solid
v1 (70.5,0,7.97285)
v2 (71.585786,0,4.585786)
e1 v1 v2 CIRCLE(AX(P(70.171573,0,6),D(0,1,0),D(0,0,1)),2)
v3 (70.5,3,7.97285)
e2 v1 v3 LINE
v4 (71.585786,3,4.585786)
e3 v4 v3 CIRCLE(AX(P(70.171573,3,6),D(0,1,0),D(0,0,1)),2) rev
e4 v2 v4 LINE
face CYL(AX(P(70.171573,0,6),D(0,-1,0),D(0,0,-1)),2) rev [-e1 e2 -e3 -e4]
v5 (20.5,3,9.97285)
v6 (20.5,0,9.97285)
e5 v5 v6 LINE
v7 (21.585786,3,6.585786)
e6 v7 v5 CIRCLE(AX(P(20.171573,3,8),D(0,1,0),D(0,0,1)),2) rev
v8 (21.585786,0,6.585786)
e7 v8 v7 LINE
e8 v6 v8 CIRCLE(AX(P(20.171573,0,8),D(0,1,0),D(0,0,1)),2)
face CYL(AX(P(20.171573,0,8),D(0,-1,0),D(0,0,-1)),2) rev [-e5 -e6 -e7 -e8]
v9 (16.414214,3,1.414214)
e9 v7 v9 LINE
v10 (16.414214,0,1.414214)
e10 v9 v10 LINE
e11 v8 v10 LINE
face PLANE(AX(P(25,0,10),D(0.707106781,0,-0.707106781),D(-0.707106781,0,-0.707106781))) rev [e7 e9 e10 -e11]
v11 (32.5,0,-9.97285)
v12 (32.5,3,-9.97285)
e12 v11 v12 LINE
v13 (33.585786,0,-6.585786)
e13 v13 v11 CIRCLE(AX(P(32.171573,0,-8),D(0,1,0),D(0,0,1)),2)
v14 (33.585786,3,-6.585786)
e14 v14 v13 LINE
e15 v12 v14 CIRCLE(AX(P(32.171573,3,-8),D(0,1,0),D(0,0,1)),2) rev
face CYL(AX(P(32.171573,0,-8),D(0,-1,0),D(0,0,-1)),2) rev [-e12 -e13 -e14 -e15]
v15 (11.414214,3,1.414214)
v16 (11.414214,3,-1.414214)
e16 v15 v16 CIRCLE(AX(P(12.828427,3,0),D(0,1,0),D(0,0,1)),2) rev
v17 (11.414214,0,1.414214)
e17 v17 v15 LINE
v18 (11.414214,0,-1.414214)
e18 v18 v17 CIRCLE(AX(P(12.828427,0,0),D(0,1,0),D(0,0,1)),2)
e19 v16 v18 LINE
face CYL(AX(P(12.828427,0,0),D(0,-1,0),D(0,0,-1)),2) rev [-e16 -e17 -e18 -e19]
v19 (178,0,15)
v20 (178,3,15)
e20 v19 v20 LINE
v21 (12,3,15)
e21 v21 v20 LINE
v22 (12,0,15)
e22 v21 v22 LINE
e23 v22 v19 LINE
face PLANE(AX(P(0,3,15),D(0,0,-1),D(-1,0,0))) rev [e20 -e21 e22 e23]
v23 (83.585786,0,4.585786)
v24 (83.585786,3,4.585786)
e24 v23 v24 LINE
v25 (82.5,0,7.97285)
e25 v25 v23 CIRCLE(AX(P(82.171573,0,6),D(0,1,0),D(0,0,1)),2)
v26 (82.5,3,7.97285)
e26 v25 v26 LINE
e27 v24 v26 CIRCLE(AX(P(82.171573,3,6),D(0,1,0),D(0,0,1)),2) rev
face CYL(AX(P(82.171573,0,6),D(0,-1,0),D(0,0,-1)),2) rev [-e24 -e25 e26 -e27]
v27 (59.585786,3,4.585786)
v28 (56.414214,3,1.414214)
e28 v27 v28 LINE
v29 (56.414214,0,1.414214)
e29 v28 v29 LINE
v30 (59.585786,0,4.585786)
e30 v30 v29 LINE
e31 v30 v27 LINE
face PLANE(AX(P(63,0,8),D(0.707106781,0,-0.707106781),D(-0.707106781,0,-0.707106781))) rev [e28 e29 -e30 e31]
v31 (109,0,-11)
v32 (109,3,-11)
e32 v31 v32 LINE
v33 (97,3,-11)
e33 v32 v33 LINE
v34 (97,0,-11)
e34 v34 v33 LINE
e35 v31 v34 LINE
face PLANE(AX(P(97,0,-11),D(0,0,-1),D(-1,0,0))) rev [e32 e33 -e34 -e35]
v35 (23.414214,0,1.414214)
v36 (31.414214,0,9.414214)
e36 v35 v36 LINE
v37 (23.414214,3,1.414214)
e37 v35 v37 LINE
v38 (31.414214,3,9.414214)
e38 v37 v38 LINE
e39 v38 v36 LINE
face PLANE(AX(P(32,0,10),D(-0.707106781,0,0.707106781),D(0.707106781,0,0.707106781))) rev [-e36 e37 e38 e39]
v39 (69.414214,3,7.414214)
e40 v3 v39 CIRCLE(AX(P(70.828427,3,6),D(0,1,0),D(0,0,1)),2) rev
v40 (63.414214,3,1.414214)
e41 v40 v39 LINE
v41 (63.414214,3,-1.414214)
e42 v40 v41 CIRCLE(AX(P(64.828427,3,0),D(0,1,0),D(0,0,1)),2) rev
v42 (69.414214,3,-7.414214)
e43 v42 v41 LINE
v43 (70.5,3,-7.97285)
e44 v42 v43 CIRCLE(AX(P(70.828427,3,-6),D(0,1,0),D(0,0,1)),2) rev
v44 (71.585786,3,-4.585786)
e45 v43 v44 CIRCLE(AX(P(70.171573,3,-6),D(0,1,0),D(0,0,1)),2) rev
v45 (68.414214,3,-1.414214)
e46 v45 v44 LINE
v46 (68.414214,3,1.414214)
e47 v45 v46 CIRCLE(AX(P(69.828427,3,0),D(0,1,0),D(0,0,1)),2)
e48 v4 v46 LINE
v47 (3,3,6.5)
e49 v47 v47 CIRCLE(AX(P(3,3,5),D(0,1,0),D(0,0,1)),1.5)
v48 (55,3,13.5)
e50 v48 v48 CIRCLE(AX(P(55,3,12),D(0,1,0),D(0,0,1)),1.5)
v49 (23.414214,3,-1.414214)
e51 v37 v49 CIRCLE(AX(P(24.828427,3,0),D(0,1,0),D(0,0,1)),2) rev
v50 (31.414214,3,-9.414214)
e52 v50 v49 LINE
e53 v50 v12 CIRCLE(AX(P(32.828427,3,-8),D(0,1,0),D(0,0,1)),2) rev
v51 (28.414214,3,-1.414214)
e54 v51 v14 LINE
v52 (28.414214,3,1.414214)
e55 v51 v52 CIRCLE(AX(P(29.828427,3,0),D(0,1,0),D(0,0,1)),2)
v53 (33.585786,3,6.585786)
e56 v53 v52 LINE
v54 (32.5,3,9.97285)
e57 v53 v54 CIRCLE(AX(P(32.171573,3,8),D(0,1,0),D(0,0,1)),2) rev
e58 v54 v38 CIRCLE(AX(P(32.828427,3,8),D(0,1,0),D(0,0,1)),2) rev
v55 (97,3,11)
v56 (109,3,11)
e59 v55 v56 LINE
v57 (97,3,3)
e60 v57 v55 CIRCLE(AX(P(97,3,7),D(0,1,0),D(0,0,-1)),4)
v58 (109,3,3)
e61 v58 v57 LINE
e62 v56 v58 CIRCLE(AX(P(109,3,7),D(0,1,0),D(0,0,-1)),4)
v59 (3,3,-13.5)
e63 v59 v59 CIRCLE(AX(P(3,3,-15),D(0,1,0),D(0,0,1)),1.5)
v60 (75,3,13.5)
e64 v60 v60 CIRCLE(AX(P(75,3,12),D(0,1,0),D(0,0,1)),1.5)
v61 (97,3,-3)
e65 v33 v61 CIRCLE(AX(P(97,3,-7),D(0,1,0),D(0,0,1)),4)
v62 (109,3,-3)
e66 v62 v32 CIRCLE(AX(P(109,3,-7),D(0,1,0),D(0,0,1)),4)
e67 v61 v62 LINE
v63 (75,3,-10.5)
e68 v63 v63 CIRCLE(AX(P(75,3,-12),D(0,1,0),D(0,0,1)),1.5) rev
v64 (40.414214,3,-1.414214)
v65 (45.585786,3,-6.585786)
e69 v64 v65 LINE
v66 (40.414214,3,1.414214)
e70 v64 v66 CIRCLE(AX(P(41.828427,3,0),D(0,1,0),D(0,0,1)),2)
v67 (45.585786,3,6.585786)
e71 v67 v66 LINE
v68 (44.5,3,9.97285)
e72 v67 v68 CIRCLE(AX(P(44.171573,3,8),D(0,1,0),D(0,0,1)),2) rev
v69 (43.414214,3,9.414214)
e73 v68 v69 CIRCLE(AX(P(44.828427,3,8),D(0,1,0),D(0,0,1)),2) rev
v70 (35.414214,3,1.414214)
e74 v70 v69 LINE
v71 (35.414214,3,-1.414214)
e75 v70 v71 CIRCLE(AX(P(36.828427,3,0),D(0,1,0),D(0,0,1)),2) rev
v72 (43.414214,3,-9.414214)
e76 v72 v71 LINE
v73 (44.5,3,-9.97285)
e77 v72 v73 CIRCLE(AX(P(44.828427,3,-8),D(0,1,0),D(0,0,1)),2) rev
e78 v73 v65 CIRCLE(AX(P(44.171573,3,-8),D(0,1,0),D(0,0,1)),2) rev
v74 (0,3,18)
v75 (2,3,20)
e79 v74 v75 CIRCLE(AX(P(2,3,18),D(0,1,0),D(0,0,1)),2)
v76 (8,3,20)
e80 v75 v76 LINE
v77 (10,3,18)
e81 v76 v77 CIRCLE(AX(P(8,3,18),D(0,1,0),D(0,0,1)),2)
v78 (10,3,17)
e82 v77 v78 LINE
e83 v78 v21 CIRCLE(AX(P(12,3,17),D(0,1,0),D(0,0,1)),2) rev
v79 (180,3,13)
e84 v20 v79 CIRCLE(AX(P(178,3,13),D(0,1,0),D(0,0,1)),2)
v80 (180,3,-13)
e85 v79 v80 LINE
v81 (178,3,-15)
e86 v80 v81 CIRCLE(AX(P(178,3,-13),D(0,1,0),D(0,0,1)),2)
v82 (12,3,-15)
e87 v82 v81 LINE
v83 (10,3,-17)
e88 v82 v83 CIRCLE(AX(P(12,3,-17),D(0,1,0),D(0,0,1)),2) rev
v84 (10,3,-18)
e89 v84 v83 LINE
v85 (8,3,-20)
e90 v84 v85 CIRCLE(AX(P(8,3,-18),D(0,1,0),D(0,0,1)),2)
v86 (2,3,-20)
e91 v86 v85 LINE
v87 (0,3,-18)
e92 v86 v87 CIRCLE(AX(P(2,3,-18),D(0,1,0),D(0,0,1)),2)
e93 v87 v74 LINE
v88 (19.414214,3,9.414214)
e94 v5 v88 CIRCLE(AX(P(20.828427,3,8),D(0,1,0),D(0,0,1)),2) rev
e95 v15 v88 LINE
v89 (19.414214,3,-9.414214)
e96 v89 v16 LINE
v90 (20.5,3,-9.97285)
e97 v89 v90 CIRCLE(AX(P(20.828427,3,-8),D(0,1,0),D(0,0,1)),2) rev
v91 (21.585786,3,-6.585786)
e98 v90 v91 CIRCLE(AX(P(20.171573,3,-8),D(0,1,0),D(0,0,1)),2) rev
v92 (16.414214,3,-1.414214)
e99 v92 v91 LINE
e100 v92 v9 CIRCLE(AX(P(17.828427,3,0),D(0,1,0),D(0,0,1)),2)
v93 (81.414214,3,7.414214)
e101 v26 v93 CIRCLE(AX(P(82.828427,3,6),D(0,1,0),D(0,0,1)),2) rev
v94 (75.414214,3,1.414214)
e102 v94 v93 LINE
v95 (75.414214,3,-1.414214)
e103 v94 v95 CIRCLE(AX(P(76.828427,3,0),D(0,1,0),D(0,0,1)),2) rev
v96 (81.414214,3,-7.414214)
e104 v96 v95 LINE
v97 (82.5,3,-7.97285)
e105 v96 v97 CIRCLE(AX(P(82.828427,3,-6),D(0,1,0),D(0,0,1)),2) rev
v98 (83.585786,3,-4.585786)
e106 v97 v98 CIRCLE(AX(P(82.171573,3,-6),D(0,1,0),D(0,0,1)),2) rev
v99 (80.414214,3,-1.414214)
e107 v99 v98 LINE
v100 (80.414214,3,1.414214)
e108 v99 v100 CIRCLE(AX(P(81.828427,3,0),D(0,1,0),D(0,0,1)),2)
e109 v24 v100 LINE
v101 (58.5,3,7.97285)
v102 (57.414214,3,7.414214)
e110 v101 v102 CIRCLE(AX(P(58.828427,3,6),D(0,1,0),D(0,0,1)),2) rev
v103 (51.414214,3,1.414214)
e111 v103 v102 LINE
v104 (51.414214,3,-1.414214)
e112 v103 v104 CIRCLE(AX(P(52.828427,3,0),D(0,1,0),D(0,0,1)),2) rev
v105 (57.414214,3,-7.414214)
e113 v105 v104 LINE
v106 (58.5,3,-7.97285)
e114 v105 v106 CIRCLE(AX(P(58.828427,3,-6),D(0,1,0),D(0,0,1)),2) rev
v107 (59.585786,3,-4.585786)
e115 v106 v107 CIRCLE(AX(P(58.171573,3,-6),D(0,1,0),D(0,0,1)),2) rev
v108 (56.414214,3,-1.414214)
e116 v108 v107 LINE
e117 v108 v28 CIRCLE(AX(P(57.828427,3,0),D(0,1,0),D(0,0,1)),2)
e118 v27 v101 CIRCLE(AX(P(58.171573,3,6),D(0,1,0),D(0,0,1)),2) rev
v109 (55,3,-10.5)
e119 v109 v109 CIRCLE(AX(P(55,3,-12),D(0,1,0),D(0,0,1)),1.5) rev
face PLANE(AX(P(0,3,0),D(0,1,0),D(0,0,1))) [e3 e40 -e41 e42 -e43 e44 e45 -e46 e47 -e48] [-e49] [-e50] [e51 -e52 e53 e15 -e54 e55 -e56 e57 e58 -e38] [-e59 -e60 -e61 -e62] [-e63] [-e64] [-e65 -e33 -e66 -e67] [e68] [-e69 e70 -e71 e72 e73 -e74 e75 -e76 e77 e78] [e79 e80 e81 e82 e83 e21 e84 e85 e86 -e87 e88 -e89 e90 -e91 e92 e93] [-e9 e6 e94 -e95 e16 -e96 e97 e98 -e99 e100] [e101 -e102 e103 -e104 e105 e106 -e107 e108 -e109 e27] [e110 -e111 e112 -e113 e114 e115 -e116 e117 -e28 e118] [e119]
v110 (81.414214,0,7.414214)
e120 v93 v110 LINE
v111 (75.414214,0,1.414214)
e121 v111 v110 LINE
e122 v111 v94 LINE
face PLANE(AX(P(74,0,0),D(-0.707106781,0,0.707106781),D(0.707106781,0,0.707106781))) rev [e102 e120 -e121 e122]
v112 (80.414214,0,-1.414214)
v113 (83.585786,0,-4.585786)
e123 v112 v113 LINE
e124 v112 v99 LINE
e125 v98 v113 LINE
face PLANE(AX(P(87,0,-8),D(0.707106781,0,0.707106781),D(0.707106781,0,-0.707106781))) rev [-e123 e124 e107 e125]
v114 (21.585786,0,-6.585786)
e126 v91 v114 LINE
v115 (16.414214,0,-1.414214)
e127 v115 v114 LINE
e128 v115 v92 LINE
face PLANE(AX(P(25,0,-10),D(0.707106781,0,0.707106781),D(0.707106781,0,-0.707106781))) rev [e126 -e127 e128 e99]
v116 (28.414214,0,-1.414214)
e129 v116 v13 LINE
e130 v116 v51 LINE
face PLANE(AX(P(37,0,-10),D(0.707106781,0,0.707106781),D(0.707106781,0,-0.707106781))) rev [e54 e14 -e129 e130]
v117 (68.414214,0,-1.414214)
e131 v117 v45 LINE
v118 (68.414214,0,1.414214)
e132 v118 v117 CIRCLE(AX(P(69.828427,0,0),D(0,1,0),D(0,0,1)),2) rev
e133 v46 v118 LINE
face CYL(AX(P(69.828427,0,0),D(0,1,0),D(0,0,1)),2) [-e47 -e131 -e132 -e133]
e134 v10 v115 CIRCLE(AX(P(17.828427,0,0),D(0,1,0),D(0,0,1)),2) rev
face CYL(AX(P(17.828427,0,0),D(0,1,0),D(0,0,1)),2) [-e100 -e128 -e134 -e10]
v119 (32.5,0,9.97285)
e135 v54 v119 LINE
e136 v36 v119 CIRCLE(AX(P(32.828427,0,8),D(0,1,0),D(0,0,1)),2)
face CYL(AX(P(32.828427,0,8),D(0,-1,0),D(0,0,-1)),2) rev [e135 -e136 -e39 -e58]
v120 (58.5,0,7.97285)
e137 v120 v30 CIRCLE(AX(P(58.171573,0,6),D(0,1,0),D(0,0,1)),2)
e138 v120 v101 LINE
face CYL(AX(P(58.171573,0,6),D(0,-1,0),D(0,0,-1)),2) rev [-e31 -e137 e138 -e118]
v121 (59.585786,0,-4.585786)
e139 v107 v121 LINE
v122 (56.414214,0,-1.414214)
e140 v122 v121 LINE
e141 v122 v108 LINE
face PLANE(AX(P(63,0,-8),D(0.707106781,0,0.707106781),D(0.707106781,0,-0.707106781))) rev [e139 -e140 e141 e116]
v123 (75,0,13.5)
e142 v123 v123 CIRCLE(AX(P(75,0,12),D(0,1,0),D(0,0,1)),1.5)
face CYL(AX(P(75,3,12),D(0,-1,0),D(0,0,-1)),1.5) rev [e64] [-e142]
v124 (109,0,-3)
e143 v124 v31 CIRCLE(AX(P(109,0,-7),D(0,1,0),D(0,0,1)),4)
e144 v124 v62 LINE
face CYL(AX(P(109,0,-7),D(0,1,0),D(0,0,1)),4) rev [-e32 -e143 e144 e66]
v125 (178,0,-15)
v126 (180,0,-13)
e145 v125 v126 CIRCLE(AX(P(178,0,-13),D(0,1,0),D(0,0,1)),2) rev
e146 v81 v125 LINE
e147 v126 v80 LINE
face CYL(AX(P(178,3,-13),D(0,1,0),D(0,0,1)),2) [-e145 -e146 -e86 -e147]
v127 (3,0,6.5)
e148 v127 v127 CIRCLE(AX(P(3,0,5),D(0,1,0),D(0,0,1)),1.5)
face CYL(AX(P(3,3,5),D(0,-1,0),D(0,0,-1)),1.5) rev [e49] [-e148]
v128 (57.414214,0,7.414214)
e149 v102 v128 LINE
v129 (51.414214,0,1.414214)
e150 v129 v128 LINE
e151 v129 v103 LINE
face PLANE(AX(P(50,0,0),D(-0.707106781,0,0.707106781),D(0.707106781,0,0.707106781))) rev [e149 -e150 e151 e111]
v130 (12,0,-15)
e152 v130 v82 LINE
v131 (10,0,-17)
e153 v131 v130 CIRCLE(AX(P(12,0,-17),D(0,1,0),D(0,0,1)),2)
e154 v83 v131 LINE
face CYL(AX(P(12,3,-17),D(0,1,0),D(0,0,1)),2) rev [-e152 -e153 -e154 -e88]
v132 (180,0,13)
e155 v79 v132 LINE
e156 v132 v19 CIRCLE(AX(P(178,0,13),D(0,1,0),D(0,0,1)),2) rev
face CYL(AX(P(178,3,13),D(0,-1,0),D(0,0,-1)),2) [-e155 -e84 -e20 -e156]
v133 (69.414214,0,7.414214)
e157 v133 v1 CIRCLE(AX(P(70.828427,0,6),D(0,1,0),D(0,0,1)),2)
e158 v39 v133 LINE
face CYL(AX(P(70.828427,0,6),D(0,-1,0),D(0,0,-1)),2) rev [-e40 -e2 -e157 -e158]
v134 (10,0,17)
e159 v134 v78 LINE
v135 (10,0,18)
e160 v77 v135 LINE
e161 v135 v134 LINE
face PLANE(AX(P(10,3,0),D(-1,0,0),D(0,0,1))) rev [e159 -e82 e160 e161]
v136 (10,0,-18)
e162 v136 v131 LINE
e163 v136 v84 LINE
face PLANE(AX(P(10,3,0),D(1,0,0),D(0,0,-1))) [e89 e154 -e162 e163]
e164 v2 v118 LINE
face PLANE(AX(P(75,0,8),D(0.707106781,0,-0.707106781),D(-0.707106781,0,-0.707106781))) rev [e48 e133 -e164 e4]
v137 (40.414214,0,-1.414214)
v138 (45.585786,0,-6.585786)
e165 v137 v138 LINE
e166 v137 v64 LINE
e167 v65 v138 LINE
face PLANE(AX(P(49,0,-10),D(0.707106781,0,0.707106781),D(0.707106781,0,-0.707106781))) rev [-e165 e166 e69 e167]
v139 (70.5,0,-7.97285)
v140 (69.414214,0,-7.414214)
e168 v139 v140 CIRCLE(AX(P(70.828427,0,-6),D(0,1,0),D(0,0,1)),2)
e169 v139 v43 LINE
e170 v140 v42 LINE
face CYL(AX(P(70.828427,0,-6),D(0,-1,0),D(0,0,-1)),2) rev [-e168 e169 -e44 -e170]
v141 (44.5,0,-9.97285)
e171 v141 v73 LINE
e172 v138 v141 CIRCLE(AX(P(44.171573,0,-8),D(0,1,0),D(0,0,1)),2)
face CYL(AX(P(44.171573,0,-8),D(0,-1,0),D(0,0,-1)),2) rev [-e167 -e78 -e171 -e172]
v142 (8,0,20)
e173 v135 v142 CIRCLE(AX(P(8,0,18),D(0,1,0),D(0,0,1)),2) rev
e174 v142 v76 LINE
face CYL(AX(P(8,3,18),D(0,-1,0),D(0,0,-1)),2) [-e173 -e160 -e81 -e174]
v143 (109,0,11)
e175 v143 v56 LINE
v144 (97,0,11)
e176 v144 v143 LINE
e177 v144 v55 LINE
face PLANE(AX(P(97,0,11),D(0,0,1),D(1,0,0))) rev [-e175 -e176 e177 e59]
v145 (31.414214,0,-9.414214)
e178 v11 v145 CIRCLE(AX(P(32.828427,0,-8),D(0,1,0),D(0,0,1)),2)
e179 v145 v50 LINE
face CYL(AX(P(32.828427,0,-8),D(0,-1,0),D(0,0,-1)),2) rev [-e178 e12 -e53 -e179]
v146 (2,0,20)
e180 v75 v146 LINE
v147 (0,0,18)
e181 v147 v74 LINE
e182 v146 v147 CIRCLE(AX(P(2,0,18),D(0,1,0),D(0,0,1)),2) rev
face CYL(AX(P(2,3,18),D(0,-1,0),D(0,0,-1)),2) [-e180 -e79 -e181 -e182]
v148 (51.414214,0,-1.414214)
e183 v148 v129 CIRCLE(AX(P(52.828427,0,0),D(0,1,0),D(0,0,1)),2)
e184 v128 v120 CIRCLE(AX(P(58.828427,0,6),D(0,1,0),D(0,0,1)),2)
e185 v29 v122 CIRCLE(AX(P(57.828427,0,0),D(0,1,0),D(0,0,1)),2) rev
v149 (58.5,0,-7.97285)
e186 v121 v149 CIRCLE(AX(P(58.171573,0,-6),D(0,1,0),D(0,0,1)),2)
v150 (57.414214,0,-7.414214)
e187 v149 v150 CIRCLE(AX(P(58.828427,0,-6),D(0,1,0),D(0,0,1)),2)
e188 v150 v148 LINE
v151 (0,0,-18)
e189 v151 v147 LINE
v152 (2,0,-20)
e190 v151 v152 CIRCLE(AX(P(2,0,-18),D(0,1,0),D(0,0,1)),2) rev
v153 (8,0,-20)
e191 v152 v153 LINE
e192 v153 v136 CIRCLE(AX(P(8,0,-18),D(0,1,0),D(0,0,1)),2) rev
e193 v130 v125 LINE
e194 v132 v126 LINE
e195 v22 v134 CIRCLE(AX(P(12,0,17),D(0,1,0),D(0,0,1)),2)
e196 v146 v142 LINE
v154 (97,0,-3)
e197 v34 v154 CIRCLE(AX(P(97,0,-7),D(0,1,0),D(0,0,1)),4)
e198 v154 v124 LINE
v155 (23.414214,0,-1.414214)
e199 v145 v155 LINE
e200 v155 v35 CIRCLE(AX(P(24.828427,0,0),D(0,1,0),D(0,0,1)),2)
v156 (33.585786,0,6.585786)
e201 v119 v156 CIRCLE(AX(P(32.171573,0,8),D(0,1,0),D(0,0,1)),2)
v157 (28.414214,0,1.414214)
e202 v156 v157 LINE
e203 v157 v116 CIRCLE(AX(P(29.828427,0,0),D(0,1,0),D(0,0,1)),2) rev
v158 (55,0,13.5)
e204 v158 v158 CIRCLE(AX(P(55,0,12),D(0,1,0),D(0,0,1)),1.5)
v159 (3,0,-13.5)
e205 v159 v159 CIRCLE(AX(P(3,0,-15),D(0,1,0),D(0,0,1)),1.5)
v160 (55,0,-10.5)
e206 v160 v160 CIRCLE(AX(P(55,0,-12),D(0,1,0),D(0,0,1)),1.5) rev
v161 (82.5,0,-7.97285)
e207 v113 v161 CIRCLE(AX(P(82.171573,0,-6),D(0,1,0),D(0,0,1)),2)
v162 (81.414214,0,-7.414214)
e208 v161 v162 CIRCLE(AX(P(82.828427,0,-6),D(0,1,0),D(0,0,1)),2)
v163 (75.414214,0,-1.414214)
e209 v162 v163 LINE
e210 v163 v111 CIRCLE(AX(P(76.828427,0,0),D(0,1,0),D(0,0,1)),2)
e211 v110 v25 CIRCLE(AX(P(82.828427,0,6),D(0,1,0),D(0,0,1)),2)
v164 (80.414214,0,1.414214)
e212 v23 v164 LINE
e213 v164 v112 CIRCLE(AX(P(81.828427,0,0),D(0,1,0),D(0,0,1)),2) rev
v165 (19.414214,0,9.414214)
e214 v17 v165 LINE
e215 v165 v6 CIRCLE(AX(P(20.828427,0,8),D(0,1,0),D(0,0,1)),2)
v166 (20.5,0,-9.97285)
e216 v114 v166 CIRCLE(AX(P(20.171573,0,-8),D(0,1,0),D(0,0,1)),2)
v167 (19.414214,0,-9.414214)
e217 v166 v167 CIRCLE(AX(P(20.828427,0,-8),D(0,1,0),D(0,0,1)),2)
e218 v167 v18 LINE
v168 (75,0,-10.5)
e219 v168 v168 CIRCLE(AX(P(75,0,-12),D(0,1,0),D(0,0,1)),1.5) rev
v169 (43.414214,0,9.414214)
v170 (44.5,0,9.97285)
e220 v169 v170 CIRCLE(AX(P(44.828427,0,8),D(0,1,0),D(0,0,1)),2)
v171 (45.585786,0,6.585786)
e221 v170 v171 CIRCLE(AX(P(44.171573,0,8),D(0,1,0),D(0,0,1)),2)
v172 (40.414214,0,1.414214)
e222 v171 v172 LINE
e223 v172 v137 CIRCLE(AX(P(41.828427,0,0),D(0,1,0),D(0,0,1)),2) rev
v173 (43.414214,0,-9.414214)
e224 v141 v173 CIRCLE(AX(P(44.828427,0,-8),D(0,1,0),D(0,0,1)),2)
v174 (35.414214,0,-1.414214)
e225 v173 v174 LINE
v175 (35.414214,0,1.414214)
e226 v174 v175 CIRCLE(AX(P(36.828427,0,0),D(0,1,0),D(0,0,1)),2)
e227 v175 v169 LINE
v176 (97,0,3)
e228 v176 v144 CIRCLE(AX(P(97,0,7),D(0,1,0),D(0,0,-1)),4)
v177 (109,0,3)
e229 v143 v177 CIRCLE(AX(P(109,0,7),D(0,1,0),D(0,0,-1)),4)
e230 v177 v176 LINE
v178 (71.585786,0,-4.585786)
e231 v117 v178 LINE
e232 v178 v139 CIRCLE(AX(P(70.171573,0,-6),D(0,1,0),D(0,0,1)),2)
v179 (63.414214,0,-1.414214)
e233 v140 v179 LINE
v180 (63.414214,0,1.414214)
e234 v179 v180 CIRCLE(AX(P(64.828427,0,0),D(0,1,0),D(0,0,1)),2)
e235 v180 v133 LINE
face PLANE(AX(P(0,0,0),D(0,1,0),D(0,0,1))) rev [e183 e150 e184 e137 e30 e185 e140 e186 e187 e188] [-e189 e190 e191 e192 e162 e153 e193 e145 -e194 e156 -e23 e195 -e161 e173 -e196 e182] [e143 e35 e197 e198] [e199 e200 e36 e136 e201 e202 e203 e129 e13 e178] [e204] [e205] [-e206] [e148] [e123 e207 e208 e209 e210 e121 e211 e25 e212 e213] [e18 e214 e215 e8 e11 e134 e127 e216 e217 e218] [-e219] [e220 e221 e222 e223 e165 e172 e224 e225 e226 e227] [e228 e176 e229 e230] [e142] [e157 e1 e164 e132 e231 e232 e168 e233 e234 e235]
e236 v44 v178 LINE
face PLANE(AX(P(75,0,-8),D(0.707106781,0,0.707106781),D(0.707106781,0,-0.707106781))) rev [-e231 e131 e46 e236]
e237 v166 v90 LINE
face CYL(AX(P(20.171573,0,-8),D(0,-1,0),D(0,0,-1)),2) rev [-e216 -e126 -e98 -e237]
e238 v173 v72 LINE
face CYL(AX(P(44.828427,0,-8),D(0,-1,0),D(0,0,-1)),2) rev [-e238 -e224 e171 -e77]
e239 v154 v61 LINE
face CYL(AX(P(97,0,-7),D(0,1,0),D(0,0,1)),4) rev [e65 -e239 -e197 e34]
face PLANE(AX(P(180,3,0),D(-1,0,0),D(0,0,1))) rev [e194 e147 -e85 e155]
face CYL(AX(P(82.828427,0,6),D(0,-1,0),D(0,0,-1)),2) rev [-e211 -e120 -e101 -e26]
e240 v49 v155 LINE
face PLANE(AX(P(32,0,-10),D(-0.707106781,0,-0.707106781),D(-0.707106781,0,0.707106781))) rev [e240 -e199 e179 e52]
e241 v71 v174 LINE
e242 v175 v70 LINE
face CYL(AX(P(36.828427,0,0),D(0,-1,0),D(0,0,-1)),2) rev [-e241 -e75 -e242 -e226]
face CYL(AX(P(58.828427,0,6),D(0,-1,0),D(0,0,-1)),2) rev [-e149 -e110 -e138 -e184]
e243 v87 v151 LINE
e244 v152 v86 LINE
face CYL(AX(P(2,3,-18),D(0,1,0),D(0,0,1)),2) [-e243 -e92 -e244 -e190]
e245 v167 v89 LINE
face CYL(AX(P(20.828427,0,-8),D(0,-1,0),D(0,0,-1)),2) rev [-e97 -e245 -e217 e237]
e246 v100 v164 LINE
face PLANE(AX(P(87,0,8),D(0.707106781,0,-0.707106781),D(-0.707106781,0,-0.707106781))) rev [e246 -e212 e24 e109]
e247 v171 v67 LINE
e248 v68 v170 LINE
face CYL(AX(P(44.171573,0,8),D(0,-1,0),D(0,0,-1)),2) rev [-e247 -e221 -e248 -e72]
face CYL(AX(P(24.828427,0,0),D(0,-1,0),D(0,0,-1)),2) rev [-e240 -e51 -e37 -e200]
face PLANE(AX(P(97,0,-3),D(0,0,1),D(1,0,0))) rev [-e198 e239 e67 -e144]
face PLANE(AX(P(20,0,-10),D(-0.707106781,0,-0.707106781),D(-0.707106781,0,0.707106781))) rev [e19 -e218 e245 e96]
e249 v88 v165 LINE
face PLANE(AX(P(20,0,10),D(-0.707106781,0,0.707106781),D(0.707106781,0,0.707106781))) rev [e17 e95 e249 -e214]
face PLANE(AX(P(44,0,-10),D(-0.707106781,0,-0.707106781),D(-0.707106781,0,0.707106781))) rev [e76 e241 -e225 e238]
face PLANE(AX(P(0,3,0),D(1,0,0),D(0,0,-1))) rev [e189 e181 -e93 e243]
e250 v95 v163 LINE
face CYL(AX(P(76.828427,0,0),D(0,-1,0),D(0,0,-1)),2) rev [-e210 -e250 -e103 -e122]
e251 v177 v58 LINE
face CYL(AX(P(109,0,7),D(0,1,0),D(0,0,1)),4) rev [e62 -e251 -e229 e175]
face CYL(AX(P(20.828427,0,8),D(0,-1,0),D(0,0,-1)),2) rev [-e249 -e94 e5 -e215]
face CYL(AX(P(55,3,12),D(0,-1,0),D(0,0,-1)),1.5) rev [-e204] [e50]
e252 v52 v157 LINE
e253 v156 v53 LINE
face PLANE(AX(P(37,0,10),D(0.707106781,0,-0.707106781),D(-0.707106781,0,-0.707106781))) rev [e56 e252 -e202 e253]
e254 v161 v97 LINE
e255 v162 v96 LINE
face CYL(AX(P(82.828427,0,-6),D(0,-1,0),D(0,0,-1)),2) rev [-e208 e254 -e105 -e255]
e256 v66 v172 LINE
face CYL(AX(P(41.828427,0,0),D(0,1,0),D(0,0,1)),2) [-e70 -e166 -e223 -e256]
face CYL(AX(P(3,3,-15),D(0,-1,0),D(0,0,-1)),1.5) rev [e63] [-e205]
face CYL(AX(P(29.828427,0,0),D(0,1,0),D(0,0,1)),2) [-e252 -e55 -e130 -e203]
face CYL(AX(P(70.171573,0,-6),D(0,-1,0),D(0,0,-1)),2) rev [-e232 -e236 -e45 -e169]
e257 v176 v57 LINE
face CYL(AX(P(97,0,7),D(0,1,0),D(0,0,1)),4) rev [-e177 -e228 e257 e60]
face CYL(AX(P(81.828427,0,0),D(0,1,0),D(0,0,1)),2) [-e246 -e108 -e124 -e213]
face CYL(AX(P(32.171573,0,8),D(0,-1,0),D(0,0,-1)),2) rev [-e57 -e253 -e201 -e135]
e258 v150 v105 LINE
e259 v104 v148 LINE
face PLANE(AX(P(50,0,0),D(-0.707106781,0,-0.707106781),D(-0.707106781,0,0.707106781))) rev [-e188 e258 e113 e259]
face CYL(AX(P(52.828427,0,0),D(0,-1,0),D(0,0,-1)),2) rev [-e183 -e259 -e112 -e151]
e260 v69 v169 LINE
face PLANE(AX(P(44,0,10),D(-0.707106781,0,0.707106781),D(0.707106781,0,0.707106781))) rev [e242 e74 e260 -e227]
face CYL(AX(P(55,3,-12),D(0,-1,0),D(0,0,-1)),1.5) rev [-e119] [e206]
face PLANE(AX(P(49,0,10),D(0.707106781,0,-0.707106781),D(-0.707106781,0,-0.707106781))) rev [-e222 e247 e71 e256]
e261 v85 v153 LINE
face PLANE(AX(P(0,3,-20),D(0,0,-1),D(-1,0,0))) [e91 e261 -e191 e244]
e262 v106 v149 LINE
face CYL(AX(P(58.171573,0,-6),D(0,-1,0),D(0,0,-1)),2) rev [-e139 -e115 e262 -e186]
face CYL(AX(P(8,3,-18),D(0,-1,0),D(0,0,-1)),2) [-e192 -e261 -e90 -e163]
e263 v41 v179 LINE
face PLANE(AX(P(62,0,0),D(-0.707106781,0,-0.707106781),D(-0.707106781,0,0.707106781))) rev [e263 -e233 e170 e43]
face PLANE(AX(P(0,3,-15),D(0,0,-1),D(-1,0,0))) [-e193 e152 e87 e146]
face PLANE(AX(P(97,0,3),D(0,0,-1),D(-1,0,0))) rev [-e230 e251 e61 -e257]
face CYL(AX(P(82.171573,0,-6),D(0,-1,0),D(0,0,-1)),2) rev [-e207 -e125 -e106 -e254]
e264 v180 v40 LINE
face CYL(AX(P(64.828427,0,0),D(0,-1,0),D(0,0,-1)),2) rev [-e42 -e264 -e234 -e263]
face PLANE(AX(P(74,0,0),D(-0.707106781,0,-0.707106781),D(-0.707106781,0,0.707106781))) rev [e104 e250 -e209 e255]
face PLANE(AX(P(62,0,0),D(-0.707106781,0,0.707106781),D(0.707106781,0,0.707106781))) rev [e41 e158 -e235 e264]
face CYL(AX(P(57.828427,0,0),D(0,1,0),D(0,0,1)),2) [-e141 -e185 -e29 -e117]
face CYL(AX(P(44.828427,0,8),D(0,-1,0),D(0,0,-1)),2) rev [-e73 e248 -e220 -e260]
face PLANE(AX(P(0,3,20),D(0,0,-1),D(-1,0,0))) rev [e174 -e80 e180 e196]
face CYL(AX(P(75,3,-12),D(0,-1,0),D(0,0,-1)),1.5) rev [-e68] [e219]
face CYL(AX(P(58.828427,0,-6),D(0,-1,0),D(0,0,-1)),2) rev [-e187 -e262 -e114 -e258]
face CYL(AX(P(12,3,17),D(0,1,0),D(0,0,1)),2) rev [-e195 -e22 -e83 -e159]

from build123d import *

# Parameters (mm, degrees)
SKETCH_1_R          = 1.5
EXTRUDE_1_DEPTH     = 3
CUT_EXTRUDE_1_DEPTH = 182.132548152
FILLET_1_R          = 2


with BuildPart() as part:
    # 草图1 → 凸台-拉伸1 (new body)
    with BuildSketch(Plane(origin=(0, 0, 0), x_dir=(1, 0, 0), z_dir=(0, 1, 0))):
        Polygon((10, -15), (180, -15), (180, 15), (10, 15), (10, 20), (0, 20), (0, -20), (10, -20), align=None)
        with Locations(Location((55, -12, 0), (0, 0, 270))):
            Circle(SKETCH_1_R, mode=Mode.SUBTRACT)
        with Locations(Location((75, -12, 0), (0, 0, 270))):
            Circle(SKETCH_1_R, mode=Mode.SUBTRACT)
        with Locations(Location((3, 15, 0), (0, 0, 270))):
            Circle(SKETCH_1_R, mode=Mode.SUBTRACT)
        with Locations(Location((3, -5, 0), (0, 0, 270))):
            Circle(SKETCH_1_R, mode=Mode.SUBTRACT)
        with Locations(Location((75, 12, 0), (0, 0, 270))):
            Circle(SKETCH_1_R, mode=Mode.SUBTRACT)
        with Locations(Location((55, 12, 0), (0, 0, 270))):
            Circle(SKETCH_1_R, mode=Mode.SUBTRACT)
    extrude(amount=EXTRUDE_1_DEPTH)

    # 草图2 → 切除-拉伸1 (cut, through all)
    with BuildSketch(Plane(origin=(0, 3, 0), x_dir=(1, 0, 0), z_dir=(0, 1, 0))):
        Polygon((20, 10), (10, 0), (20, -10), (25, -10), (15, 0), (25, 10), align=None)
        Polygon((32, -10), (22, 0), (32, 10), (37, 10), (27, 0), (37, -10), align=None)
        Polygon((44, -10), (34, 0), (44, 10), (49, 10), (39, 0), (49, -10), align=None)
        Polygon((50, 0), (58, 8), (63, 8), (55, 0), (63, -8), (58, -8), align=None)
        Polygon((75, -8), (67, 0), (75, 8), (70, 8), (62, 0), (70, -8), align=None)
        Polygon((87, -8), (79, 0), (87, 8), (82, 8), (74, 0), (82, -8), align=None)
        with BuildLine():
            Line((97, 11), (109, 11))
            ThreePointArc((109, 11), (113, 7), (109, 3))
            Line((109, 3), (97, 3))
            ThreePointArc((97, 3), (93, 7), (97, 11))
        make_face()
        with BuildLine():
            Line((97, -11), (109, -11))
            ThreePointArc((109, -11), (113, -7), (109, -3))
            Line((109, -3), (97, -3))
            ThreePointArc((97, -3), (93, -7), (97, -11))
        make_face()
    extrude(amount=-CUT_EXTRUDE_1_DEPTH, mode=Mode.SUBTRACT)

    # 圆角1
    # the kernel refuses this fillet: 2 mm, written as the material it adds along each edge
    with BuildSketch(Plane(origin=(10, 0, -15), x_dir=(1, 0, 0), z_dir=(0, 1, 0)), Plane(origin=(10, 3, 0), x_dir=(0.7071067811865515, 0, -0.7071067811865436), z_dir=(0, -1, 0)), Plane(origin=(34, 3, 0), x_dir=(0.7071067811865507, 0, -0.7071067811865445), z_dir=(0, -1, 0)), Plane(origin=(22, 3, 0), x_dir=(0.7071067811865511, 0, -0.7071067811865441), z_dir=(0, -1, 0)), Plane(origin=(62, 3, 0), x_dir=(0.7071067811865536, 0, -0.7071067811865415), z_dir=(0, -1, 0)), Plane(origin=(74, 3, 0), x_dir=(0.7071067811865546, 0, -0.7071067811865407), z_dir=(0, -1, 0))) as fillet_1_piece_1:
        with BuildLine():
            CenterArc((FILLET_1_R, FILLET_1_R), FILLET_1_R, 180, 90)
            Line((0, FILLET_1_R), (0, 0))
            Line((0, 0), (FILLET_1_R, 0))
        make_face()
    extrude(amount=3)
    with BuildSketch(Plane(origin=(10, 0, 15), x_dir=(1, 0, 0), z_dir=(0, 1, 0)), Plane(origin=(50, 3, 0), x_dir=(0.7071067811865553, 0, 0.7071067811865399), z_dir=(0, -1, 0))) as fillet_1_piece_2:
        with BuildLine():
            CenterArc((FILLET_1_R, -FILLET_1_R), FILLET_1_R, 90, 90)
            Line((0, -FILLET_1_R), (0, 0))
            Line((0, 0), (FILLET_1_R, 0))
        make_face()
    extrude(amount=3)
    with BuildSketch(Plane(origin=(20, 3, -10), x_dir=(-0.7071067811865507, 0, 0.7071067811865442), z_dir=(0, -1, 0)), Plane(origin=(44, 3, 10), x_dir=(1, 0, 0), z_dir=(0, -1, 0)), Plane(origin=(32, 3, 10), x_dir=(1, 0, 0), z_dir=(0, -1, 0))) as fillet_1_piece_3:
        with BuildLine():
            CenterArc((FILLET_1_R * 0.414213562373, -FILLET_1_R), FILLET_1_R, 90, 45)
            Line((-FILLET_1_R * 0.292893218813, -FILLET_1_R * 0.292893218813), (0, 0))
            Line((0, 0), (FILLET_1_R * 0.414213562373, 0))
        make_face()
    extrude(amount=3)
    with BuildSketch(Plane(origin=(20, 3, 10), x_dir=(-0.7071067811865507, 0, -0.7071067811865442), z_dir=(0, -1, 0)), Plane(origin=(44, 3, -10), x_dir=(1, 0, 0), z_dir=(0, -1, 0)), Plane(origin=(32, 3, -10), x_dir=(1, 0, 0), z_dir=(0, -1, 0)), Plane(origin=(70, 3, -8), x_dir=(1, 0, 0), z_dir=(0, -1, 0)), Plane(origin=(70, 3, 8), x_dir=(-0.707106781186555, 0, -0.70710678118654), z_dir=(0, -1, 0)), Plane(origin=(58, 3, 8), x_dir=(-0.7071067811865513, 0, -0.7071067811865438), z_dir=(0, -1, 0)), Plane(origin=(82, 3, -8), x_dir=(1, 0, 0), z_dir=(0, -1, 0)), Plane(origin=(82, 3, 8), x_dir=(-0.7071067811865583, 0, -0.7071067811865369), z_dir=(0, -1, 0)), Plane(origin=(58, 3, -8), x_dir=(1, 0, 0), z_dir=(0, -1, 0))) as fillet_1_piece_4:
        with BuildLine():
            CenterArc((FILLET_1_R * 0.414213562373, FILLET_1_R), FILLET_1_R, 225, 45)
            Line((-FILLET_1_R * 0.292893218813, FILLET_1_R * 0.292893218813), (0, 0))
            Line((0, 0), (FILLET_1_R * 0.414213562373, 0))
        make_face()
    extrude(amount=3)
    with BuildSketch(Plane(origin=(25, 3, 10), x_dir=(-1, 0, 0), z_dir=(0, -1, 0)), Plane(origin=(25, 3, -10), x_dir=(-0.7071067811865513, 0, 0.7071067811865436), z_dir=(0, -1, 0)), Plane(origin=(49, 3, 10), x_dir=(-1, 0, 0), z_dir=(0, -1, 0)), Plane(origin=(49, 3, -10), x_dir=(-0.7071067811865511, 0, 0.7071067811865439), z_dir=(0, -1, 0)), Plane(origin=(37, 3, 10), x_dir=(-1, 0, 0), z_dir=(0, -1, 0)), Plane(origin=(37, 3, -10), x_dir=(-0.707106781186551, 0, 0.707106781186544), z_dir=(0, -1, 0)), Plane(origin=(75, 3, -8), x_dir=(-0.7071067811865541, 0, 0.7071067811865409), z_dir=(0, -1, 0)), Plane(origin=(63, 3, -8), x_dir=(-0.7071067811865546, 0, 0.7071067811865406), z_dir=(0, -1, 0)), Plane(origin=(63, 3, 8), x_dir=(-1, 0, 0), z_dir=(0, -1, 0)), Plane(origin=(87, 3, -8), x_dir=(-0.7071067811865531, 0, 0.7071067811865421), z_dir=(0, -1, 0))) as fillet_1_piece_5:
        with BuildLine():
            CenterArc((FILLET_1_R * 2.41421356237, FILLET_1_R), FILLET_1_R, 135, 135)
            Line((FILLET_1_R * 1.70710678119, FILLET_1_R * 1.70710678119), (0, 0))
            Line((0, 0), (FILLET_1_R * 2.41421356237, 0))
        make_face()
    extrude(amount=3)
    with BuildSketch(Plane(origin=(75, 3, 8), x_dir=(-0.7071067811865545, 0, -0.7071067811865405), z_dir=(0, -1, 0)), Plane(origin=(87, 3, 8), x_dir=(-0.7071067811865538, 0, -0.7071067811865415), z_dir=(0, -1, 0))) as fillet_1_piece_6:
        with BuildLine():
            CenterArc((FILLET_1_R * 2.41421356237, -FILLET_1_R), FILLET_1_R, 90, 135)
            Line((FILLET_1_R * 1.70710678119, -FILLET_1_R * 1.70710678119), (0, 0))
            Line((0, 0), (FILLET_1_R * 2.41421356237, 0))
        make_face()
    extrude(amount=3)
    # the kernel refuses this fillet: 2 mm, written as the material it takes off along each edge
    with BuildSketch(Plane(origin=(10, -5, -20), x_dir=(0, 0, 1), z_dir=(0, 1, 0)), Plane(origin=(180, -5, -15), x_dir=(0, 0, 1), z_dir=(0, 1, 0)), Plane(origin=(180, -5, 15), x_dir=(-1, 0, 0), z_dir=(0, 1, 0)), Plane(origin=(15, 8, 0), x_dir=(0.7071067811865511, 0, 0.707106781186544), z_dir=(0, -1, 0)), Plane(origin=(39, 8, 0), x_dir=(0.7071067811865508, 0, 0.7071067811865444), z_dir=(0, -1, 0)), Plane(origin=(27, 8, 0), x_dir=(0.7071067811865503, 0, 0.7071067811865448), z_dir=(0, -1, 0)), Plane(origin=(67, 8, 0), x_dir=(0.7071067811865541, 0, 0.7071067811865411), z_dir=(0, -1, 0)), Plane(origin=(55, 8, 0), x_dir=(0.7071067811865553, 0, 0.7071067811865397), z_dir=(0, -1, 0)), Plane(origin=(79, 8, 0), x_dir=(0.7071067811865511, 0, 0.7071067811865439), z_dir=(0, -1, 0))) as fillet_1_2_piece_1:
        with BuildLine():
            CenterArc((FILLET_1_R, -FILLET_1_R), FILLET_1_R, 90, 90)
            Line((0, -FILLET_1_R), (0, 0))
            Line((0, 0), (FILLET_1_R, 0))
        make_face()
    extrude(amount=13, mode=Mode.SUBTRACT)
    with BuildSketch(Plane(origin=(10, -5, 20), x_dir=(0, 0, -1), z_dir=(0, 1, 0)), Plane(origin=(0, -5, 20), x_dir=(1, 0, 0), z_dir=(0, 1, 0)), Plane(origin=(0, -5, -20), x_dir=(0, 0, 1), z_dir=(0, 1, 0))) as fillet_1_2_piece_2:
        with BuildLine():
            CenterArc((FILLET_1_R, FILLET_1_R), FILLET_1_R, 180, 90)
            Line((0, FILLET_1_R), (0, 0))
            Line((0, 0), (FILLET_1_R, 0))
        make_face()
    extrude(amount=13, mode=Mode.SUBTRACT)


solid = part.part
